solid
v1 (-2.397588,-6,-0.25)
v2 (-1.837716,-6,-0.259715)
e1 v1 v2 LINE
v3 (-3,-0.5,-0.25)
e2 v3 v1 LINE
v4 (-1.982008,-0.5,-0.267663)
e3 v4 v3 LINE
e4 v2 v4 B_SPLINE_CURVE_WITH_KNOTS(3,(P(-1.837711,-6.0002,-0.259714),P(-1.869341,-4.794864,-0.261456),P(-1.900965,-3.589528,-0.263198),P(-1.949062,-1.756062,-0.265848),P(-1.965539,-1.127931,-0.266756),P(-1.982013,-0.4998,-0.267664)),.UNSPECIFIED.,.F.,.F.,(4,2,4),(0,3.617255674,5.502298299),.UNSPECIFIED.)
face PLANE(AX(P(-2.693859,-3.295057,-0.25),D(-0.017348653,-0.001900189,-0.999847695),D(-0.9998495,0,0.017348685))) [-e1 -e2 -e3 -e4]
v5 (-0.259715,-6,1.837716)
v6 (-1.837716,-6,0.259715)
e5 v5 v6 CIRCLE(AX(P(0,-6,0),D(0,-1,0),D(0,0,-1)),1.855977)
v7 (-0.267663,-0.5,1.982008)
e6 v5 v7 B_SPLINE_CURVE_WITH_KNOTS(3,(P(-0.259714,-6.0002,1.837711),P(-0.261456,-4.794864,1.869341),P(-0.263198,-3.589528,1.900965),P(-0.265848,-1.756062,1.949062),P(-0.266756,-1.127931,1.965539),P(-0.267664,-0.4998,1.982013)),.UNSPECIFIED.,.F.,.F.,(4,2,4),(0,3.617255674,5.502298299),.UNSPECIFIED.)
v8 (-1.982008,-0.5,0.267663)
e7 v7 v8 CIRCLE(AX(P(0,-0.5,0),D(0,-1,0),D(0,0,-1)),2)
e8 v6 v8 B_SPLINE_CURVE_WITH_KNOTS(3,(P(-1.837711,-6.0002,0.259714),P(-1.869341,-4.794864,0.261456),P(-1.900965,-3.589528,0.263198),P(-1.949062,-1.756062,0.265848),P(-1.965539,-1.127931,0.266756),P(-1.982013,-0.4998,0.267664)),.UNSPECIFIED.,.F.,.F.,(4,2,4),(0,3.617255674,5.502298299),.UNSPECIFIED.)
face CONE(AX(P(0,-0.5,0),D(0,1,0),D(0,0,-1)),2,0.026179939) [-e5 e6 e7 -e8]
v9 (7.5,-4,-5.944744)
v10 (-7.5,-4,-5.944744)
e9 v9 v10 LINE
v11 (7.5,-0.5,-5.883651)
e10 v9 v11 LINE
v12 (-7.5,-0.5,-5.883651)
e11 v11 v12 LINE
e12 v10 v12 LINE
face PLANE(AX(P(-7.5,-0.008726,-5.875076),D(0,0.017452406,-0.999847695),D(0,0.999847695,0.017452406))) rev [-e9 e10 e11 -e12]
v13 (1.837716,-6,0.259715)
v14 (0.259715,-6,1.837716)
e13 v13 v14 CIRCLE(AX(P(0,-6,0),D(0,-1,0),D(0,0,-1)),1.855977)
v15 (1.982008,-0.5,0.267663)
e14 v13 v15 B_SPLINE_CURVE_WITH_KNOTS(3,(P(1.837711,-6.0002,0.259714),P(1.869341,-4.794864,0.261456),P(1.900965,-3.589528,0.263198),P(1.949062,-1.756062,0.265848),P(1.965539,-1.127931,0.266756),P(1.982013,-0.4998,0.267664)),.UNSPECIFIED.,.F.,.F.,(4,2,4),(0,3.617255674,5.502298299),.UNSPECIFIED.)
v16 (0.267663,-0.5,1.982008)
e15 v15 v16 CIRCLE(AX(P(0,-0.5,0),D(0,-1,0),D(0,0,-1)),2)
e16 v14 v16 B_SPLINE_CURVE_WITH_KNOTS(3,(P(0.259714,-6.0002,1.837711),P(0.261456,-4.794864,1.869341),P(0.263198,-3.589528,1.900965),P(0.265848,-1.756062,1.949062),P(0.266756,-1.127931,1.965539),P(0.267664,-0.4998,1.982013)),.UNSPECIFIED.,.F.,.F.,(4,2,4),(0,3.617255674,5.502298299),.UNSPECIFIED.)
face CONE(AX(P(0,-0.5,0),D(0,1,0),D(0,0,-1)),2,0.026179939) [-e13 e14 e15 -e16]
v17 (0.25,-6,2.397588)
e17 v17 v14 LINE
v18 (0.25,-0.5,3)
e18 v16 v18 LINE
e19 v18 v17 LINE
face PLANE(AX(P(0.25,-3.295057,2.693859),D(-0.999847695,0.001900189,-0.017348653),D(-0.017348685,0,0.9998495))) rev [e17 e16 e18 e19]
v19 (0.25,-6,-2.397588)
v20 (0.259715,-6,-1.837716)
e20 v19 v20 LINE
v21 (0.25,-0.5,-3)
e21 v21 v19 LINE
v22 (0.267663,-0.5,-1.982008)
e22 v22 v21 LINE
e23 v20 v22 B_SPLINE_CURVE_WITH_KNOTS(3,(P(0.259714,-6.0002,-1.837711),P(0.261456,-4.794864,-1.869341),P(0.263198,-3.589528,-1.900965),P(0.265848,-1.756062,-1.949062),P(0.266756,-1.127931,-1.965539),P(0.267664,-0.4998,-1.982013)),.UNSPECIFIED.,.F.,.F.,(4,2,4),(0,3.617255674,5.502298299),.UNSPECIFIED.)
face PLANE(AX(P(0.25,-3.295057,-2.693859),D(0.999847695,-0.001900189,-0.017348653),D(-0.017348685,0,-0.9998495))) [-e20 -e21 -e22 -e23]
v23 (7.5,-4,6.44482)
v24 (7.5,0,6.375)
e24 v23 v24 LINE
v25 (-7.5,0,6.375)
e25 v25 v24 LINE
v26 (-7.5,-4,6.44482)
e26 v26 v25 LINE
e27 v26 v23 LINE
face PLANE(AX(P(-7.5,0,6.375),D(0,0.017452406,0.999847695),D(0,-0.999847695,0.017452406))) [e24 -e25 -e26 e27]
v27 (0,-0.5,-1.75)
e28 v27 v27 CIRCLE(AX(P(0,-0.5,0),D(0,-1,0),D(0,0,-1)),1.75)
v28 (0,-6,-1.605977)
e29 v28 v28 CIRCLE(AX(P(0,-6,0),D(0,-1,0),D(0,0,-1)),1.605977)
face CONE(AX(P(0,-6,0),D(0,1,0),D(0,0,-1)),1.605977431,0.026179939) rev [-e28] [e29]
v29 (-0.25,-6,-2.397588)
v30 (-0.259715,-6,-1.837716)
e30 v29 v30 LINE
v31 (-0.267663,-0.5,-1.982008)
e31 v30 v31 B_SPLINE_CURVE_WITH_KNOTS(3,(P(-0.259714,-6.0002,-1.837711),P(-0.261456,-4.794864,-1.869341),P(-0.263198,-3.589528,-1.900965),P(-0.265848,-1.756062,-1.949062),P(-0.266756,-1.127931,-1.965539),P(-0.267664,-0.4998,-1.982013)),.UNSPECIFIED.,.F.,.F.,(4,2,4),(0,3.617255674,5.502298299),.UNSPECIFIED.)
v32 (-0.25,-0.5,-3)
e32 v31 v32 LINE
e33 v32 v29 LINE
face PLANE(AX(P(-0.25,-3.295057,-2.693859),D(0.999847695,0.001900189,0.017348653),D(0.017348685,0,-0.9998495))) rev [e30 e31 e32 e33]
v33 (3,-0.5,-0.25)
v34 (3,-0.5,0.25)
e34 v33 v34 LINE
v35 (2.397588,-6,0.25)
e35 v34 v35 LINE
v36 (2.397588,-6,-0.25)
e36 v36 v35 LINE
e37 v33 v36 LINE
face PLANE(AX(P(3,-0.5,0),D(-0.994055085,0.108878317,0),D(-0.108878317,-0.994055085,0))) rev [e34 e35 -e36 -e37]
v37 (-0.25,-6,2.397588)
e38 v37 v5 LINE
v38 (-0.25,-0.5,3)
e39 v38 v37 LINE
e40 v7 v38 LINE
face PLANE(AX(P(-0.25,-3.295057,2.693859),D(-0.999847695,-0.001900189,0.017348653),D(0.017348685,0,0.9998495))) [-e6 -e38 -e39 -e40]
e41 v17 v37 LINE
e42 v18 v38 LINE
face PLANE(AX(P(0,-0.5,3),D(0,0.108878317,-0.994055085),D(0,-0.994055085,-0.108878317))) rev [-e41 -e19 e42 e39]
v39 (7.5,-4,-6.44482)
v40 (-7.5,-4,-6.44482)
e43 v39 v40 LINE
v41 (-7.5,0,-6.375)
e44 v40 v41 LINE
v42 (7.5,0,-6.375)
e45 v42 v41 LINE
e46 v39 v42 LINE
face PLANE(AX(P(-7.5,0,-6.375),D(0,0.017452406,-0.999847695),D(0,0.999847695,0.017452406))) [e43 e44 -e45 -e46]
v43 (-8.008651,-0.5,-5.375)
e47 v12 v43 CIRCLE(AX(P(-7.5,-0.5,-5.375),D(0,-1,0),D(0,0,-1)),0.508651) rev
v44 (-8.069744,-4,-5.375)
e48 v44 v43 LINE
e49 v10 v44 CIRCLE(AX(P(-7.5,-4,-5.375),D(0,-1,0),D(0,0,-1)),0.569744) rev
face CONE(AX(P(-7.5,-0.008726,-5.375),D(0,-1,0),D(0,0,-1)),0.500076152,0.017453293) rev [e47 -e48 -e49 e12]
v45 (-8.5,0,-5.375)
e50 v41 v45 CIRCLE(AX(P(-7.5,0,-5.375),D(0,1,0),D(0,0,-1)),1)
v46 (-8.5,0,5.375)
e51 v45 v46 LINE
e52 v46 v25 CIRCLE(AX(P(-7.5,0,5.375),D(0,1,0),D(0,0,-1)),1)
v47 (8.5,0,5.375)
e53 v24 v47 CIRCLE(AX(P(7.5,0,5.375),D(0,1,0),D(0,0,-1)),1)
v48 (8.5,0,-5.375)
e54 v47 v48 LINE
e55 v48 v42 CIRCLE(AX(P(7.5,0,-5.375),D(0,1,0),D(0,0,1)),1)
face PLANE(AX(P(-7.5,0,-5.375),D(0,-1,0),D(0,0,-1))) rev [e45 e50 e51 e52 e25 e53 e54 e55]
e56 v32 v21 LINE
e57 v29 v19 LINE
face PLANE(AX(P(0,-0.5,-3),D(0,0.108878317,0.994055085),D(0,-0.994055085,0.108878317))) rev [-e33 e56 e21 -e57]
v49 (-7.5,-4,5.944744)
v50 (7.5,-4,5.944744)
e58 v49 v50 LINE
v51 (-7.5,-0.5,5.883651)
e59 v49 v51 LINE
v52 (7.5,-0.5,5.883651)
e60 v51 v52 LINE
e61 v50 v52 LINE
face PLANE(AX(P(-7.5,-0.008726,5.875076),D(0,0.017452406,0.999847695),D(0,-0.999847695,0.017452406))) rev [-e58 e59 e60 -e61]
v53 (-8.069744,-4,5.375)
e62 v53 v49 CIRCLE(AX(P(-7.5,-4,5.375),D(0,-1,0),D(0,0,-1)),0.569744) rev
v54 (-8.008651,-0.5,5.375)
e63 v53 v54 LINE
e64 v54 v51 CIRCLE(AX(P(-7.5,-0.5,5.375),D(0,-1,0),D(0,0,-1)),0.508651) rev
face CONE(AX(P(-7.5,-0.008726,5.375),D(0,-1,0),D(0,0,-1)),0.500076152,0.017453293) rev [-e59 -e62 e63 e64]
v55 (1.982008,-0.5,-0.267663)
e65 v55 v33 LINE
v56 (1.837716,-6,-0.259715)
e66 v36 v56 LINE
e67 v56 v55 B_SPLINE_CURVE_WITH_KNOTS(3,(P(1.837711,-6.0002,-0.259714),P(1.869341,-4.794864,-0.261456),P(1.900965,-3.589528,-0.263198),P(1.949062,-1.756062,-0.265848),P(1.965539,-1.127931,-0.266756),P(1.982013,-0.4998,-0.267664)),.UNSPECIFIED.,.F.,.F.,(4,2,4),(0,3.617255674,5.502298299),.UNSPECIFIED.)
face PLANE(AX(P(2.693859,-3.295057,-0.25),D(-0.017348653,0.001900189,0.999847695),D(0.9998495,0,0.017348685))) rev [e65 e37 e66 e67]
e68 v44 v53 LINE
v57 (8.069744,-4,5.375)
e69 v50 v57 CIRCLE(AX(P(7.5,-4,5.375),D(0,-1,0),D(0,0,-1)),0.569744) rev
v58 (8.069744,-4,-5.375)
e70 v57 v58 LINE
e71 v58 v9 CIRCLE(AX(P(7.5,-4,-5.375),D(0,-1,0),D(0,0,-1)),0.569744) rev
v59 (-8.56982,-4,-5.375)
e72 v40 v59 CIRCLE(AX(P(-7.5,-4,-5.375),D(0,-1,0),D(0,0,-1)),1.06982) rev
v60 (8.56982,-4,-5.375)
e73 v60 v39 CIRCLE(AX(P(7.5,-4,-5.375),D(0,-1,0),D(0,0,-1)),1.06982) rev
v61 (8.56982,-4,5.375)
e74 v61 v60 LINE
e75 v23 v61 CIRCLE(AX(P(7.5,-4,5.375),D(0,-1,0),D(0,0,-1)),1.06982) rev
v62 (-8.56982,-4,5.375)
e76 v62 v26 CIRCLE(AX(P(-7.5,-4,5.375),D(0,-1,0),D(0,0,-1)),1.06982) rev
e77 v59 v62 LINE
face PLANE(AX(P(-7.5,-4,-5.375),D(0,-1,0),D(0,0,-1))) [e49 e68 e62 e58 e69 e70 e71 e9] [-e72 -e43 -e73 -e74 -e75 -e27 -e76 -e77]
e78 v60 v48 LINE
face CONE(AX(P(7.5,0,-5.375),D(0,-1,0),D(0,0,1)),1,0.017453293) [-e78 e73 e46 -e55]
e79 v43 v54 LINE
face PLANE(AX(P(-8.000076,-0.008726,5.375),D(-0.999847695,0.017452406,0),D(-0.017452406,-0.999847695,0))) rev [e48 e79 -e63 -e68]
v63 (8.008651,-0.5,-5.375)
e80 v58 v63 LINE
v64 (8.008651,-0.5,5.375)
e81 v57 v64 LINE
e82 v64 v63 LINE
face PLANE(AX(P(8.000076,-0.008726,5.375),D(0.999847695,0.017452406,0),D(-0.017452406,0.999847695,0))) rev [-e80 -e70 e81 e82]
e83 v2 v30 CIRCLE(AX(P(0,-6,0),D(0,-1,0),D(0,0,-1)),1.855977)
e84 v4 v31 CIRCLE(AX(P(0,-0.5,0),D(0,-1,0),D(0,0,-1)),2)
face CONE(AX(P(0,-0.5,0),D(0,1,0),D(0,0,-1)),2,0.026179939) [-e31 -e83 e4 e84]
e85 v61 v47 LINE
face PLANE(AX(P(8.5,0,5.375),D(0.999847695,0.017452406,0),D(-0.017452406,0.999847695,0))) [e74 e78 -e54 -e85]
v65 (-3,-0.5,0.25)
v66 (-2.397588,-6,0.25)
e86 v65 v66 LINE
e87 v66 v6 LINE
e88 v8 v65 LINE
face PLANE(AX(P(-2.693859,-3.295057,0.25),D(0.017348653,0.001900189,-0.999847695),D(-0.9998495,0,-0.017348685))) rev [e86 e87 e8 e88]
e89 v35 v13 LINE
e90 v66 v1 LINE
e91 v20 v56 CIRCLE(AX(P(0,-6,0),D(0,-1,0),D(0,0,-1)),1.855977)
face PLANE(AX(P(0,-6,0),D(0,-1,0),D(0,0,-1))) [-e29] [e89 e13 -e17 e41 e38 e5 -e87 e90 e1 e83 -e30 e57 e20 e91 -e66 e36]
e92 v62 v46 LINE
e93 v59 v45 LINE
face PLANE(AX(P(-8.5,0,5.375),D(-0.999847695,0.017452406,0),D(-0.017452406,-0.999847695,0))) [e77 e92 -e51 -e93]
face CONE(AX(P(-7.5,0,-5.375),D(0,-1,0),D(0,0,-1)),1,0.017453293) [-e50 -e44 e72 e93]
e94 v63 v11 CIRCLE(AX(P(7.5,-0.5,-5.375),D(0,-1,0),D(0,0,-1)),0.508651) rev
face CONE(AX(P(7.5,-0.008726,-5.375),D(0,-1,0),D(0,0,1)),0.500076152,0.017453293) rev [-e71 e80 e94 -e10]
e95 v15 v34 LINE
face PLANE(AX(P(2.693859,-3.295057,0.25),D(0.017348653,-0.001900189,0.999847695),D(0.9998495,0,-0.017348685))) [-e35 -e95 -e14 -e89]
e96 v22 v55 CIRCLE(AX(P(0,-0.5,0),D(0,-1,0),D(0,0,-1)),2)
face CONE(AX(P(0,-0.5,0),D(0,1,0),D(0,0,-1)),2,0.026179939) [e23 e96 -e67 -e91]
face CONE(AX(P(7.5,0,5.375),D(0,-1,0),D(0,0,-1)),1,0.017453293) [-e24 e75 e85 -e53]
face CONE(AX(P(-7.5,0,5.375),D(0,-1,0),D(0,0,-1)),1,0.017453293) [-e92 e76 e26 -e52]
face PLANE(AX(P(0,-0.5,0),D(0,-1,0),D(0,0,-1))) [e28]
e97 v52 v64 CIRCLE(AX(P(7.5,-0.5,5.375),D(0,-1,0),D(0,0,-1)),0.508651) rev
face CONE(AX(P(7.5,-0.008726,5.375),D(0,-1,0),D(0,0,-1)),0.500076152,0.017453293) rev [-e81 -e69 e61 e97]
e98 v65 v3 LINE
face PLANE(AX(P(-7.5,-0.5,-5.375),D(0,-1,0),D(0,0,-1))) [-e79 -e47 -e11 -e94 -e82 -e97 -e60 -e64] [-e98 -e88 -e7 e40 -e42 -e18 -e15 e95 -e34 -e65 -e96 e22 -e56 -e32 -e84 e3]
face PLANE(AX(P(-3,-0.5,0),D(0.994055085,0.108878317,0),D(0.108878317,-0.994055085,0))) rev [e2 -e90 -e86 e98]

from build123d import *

# Parameters (mm, degrees)
BOSS_EXTRUDE1_DEPTH = 4
BOSS_EXTRUDE1_DRAFT = 1
SHELL1_T            = -0.5
SKETCH2_R           = 2
BOSS_EXTRUDE2_DEPTH = 5.5
BOSS_EXTRUDE2_TAPER = 1.5
CIRPATTERN1_COUNT   = 4
SKETCH4_R           = 1.605977431
CUT_EXTRUDE1_DEPTH  = 5.5
CUT_EXTRUDE1_DRAFT  = 1.5


with BuildPart() as part:
    # Sketch1 → Boss-Extrude1 (with draft: the straight prism first)
    with BuildSketch(Plane(origin=(0, 0, 0), x_dir=(1, 0, 0), z_dir=(0, 1, 0))):
        with BuildLine():
            Line((-7.5, -6.375), (7.5, -6.375))
            ThreePointArc((7.5, -6.375), (8.207106781, -6.082106781), (8.5, -5.375))
            Line((8.5, -5.375), (8.5, 5.375))
            ThreePointArc((8.5, 5.375), (8.207106781, 6.082106781), (7.5, 6.375))
            Line((7.5, 6.375), (-7.5, 6.375))
            ThreePointArc((-7.5, 6.375), (-8.207106781, 6.082106781), (-8.5, 5.375))
            Line((-8.5, 5.375), (-8.5, -5.375))
            ThreePointArc((-8.5, -5.375), (-8.207106781, -6.082106781), (-7.5, -6.375))
        make_face()
    extrude(amount=-BOSS_EXTRUDE1_DEPTH)
    # Boss-Extrude1: the draft: its side faces are tilted about the plane it starts from
    boss_extrude1_sides = [part.faces().sort_by_distance(p)[0] for p in [
        (0, -2, 6.375),
        (8.207106781, -2, 6.082106781),
        (8.5, -2, 0),
        (8.207106781, -2, -6.082106781),
        (0, -2, -6.375),
        (-8.207106781, -2, -6.082106781),
        (-8.5, -2, 0),
        (-8.207106781, -2, 6.082106781),
    ]]
    draft(boss_extrude1_sides, Plane(origin=(0, 0, 0), x_dir=(1, 0, 0), z_dir=(0, 1, 0)), BOSS_EXTRUDE1_DRAFT)

    # Shell1
    shell1_openings = [part.faces().sort_by_distance(p)[0] for p in [
        (0, -4, 0),
    ]]
    offset(amount=SHELL1_T, openings=shell1_openings, kind=Kind.INTERSECTION)

    # Sketch2 → Boss-Extrude2 (add)
    with BuildSketch(Plane.XZ.offset(0.5)):
        Circle(SKETCH2_R)
    extrude(amount=BOSS_EXTRUDE2_DEPTH, taper=BOSS_EXTRUDE2_TAPER)

    # Rib1: read off the stored shape, not the designer's step
    # Rib1: loft between two sections, ruled curve by curve
    rib1_from = [
        Edge.make_line((1.982008139, -0.5, 0.267663478), (3, -0.5, 0.25)),
        Edge.make_line((1.982008139, -0.5, -0.267663478), (3, -0.5, -0.25)),
        Edge.make_line((3, -0.5, -0.25), (3, -0.5, 0.25)),
        Edge.make_line((1.982008139, -0.5, -0.267663478), (1.982008139, -0.5, 0.267663478)),
    ]
    rib1_to = [
        Edge.make_line((1.837716138, -6, 0.259714502), (2.397587968, -6, 0.25)),
        Edge.make_line((1.837716138, -6, -0.259714502), (2.397587968, -6, -0.25)),
        Edge.make_line((2.397587968, -6, -0.25), (2.397587968, -6, 0.25)),
        Edge.make_line((1.837716138, -6, -0.259714502), (1.837716138, -6, 0.259714502)),
    ]
    rib1 = Solid(Shell([*[Face.make_surface_from_curves(rib1_from[k], rib1_to[k]) for k in range(4)], Face(Wire(rib1_from)), Face(Wire(rib1_to))]))
    add(rib1)

    # CirPattern1: Rib1 ×4 about axis
    cirpattern1_axis = Axis((0, 0, 0), (0, 1, 0))
    for i in range(1, CIRPATTERN1_COUNT):
        add(rib1.rotate(cirpattern1_axis, i * 360 / CIRPATTERN1_COUNT))


with BuildPart() as cut_extrude1_tool:
    # Sketch4 → Cut-Extrude1 (with draft: the straight prism first)
    with BuildSketch(Plane.XZ.offset(6)):
        Circle(SKETCH4_R)
    extrude(amount=-CUT_EXTRUDE1_DEPTH)
    # Cut-Extrude1: the draft: its side faces are tilted about the plane it starts from
    cut_extrude1_sides = [cut_extrude1_tool.faces().sort_by_distance(p)[0] for p in [
        (-1.605977431, -3.25, 0),
    ]]
    draft(cut_extrude1_sides, Plane.XZ.offset(6), CUT_EXTRUDE1_DRAFT)


with BuildPart() as part_1:
    add(part.part)

    # Cut-Extrude1: cut by cut_extrude1_tool
    add(cut_extrude1_tool.part, mode=Mode.SUBTRACT)


solid = part_1.part
